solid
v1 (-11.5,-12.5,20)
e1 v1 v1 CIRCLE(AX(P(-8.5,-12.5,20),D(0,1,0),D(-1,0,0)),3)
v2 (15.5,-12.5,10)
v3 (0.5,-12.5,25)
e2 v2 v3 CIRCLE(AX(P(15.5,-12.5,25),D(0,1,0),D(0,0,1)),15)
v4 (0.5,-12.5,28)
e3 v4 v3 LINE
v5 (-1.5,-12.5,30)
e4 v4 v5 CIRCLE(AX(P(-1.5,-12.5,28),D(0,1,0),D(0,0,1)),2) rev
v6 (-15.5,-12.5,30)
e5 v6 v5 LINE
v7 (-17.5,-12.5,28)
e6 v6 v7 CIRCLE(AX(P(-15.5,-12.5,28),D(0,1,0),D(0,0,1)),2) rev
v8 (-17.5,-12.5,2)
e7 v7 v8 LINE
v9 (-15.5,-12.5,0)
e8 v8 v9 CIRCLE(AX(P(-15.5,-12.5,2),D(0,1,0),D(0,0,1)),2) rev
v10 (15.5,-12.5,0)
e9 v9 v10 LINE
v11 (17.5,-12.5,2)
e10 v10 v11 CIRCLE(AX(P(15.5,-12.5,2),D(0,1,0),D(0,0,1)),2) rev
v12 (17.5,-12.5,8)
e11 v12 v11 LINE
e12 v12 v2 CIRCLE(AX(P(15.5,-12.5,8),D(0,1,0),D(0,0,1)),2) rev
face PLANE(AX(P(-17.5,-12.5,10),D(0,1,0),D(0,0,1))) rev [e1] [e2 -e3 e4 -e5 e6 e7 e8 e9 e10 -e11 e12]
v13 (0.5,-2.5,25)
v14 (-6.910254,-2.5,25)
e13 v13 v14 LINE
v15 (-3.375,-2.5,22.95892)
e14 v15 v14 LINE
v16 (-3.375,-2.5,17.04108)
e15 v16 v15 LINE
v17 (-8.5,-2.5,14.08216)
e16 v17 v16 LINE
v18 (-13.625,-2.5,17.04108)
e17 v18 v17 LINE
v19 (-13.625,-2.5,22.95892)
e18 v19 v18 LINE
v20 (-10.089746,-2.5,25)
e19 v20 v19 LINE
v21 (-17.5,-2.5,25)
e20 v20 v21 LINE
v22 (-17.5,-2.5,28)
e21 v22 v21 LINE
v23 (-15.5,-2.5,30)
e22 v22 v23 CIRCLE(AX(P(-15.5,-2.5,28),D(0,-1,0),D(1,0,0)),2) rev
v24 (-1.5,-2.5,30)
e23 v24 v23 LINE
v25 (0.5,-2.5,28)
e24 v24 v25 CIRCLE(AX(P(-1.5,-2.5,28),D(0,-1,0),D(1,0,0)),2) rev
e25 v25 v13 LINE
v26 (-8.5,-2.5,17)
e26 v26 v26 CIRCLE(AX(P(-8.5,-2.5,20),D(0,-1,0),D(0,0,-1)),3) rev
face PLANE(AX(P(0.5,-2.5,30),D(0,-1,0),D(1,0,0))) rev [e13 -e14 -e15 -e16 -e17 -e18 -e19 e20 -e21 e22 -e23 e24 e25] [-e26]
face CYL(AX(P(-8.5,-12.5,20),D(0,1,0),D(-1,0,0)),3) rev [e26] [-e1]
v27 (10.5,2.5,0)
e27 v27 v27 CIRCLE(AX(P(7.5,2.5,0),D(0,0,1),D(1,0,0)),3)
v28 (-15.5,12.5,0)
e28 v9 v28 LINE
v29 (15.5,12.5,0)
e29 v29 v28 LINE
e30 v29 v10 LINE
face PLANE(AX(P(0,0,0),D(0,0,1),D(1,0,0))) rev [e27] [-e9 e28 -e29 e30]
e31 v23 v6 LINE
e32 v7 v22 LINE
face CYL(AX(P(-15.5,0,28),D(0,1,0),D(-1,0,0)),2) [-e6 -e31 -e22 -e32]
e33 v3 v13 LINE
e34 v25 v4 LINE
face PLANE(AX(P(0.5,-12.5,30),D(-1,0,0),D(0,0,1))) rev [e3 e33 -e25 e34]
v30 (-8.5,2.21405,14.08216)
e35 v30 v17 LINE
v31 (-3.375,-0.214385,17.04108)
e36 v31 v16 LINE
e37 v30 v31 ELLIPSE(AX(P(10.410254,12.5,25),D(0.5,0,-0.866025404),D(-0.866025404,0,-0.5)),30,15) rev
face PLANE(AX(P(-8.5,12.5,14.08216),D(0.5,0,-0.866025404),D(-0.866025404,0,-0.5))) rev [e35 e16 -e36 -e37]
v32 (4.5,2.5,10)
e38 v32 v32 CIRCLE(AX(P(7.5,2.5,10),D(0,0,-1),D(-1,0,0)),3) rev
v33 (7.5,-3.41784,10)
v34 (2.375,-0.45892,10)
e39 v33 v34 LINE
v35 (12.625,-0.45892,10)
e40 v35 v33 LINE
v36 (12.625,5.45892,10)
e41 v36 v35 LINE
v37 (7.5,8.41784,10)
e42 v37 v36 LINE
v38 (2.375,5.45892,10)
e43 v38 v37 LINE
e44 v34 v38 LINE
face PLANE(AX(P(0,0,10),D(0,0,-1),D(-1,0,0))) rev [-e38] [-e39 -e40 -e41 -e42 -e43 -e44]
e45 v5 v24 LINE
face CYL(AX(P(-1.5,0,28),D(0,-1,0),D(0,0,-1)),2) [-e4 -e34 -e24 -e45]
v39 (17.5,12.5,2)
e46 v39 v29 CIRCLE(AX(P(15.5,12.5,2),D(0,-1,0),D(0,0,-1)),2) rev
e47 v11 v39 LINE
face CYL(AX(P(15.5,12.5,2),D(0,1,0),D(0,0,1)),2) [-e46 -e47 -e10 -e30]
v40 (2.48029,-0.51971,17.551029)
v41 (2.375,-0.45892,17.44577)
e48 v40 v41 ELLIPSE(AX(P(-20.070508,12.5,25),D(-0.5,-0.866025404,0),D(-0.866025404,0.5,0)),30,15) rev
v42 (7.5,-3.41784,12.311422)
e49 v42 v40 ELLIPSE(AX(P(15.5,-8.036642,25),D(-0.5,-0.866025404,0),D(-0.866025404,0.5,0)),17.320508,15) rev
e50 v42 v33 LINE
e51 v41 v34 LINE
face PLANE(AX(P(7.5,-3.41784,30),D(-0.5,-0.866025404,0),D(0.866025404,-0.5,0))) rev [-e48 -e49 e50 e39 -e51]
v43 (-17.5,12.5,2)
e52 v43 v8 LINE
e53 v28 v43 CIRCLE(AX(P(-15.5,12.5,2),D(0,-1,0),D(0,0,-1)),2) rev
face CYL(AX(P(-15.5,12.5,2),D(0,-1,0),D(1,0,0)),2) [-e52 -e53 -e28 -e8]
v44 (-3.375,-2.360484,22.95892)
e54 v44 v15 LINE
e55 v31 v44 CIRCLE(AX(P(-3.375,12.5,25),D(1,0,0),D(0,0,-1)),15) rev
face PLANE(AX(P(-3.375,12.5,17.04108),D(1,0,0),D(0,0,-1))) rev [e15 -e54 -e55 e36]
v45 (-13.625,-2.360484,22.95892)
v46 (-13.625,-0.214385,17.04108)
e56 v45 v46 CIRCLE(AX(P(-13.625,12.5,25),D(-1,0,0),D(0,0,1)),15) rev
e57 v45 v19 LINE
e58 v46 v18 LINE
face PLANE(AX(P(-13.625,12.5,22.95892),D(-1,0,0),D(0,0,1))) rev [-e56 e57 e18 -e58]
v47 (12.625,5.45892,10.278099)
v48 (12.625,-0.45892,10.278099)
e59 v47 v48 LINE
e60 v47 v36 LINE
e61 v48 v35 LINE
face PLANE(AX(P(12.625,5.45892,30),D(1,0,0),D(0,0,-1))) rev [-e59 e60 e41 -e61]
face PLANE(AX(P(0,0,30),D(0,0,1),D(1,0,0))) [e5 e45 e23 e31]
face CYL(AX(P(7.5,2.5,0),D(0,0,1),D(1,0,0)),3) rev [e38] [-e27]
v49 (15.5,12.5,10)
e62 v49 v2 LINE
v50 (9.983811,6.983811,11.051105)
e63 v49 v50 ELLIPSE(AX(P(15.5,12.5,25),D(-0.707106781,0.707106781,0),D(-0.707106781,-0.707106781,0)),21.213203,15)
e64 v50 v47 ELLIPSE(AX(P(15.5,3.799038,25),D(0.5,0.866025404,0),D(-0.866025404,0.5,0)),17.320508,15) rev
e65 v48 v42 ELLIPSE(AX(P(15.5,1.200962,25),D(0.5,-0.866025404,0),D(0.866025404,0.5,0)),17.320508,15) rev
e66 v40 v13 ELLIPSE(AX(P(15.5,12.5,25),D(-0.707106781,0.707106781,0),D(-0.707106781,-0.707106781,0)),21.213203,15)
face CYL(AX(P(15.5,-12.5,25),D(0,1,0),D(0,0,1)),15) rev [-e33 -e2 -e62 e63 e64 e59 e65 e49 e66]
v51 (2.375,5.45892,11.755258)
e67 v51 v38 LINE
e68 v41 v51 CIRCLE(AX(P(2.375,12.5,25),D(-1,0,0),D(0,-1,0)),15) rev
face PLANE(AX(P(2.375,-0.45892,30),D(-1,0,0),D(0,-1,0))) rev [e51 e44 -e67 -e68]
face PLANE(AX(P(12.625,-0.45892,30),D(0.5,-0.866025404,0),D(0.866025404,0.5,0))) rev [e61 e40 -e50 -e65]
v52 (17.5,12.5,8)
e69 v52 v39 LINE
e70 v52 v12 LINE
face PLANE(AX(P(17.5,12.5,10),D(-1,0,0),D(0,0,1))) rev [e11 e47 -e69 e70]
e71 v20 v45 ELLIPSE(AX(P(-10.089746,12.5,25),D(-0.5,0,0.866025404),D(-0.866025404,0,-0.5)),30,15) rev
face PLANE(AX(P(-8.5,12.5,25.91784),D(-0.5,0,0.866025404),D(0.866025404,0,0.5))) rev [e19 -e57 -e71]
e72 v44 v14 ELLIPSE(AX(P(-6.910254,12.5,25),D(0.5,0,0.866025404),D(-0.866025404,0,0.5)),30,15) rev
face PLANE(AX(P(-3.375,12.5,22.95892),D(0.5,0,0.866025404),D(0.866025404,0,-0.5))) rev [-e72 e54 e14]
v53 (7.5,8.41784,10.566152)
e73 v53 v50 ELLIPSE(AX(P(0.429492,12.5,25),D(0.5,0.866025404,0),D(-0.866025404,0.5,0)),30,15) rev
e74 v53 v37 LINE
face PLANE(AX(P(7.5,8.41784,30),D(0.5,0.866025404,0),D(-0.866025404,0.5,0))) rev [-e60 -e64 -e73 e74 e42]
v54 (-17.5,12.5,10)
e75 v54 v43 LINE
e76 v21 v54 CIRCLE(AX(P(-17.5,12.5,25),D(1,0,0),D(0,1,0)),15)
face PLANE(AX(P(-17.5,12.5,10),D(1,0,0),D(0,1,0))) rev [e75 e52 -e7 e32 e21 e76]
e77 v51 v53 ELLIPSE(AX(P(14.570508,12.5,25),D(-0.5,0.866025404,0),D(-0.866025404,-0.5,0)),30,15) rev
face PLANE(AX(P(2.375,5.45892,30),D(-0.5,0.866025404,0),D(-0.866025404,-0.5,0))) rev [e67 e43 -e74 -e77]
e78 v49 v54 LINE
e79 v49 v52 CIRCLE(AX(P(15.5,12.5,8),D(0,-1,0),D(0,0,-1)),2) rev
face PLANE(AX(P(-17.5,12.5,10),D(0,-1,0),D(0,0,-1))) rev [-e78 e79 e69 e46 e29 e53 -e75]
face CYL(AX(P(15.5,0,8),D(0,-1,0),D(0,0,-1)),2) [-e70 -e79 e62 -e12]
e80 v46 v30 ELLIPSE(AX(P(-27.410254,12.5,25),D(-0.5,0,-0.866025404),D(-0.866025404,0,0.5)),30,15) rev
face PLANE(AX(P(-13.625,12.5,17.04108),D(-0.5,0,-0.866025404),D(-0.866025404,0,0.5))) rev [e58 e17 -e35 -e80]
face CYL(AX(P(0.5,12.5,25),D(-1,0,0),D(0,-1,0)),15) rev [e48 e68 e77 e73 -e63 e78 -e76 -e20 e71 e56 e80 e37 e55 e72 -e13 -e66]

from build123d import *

# Parameters (mm, degrees)
SKETCH1_W           = 35
SKETCH1_H           = 25
BOSS_EXTRUDE1_DEPTH = 10
SKETCH2_R           = 3
CUT_EXTRUDE1_DEPTH  = 24.717082451
SKETCH3_W           = 18
SKETCH3_H           = 10
BOSS_EXTRUDE2_DEPTH = 20
SKETCH4_R           = 3
CUT_EXTRUDE2_DEPTH  = 38.831864876
FILLET2_R           = 15
FILLET3_R           = 2
CUT_EXTRUDE3_START  = -10
CUT_EXTRUDE3_DEPTH  = 27.912057753
CUT_EXTRUDE4_START  = -10
CUT_EXTRUDE4_DEPTH  = 33.793107057


# Some blends are built 0.0001 mm under size
with BuildPart() as part:
    # Sketch1 → Boss-Extrude1 (new body)
    with BuildSketch(Plane.XY):
        Rectangle(SKETCH1_W, SKETCH1_H)
    extrude(amount=BOSS_EXTRUDE1_DEPTH)

    # Sketch2 → Cut-Extrude1 (cut, through all)
    with BuildSketch(Plane.XY.offset(10)):
        with Locations((7.5, 2.5)):
            Circle(SKETCH2_R)
    extrude(amount=-CUT_EXTRUDE1_DEPTH, mode=Mode.SUBTRACT)

    # Sketch3 → Boss-Extrude2 (add)
    with BuildSketch(Plane.XY.offset(10)):
        with Locations((-8.5, -7.5)):
            Rectangle(SKETCH3_W, SKETCH3_H)
    extrude(amount=BOSS_EXTRUDE2_DEPTH)

    # Sketch4 → Cut-Extrude2 (cut, through all)
    with BuildSketch(Plane(origin=(0, -2.5, 0), x_dir=(1, 0, 0), z_dir=(0, 1, 0))):
        with Locations(Location((-8.5, -20, 0), (0, 0, 180))):
            Circle(SKETCH4_R)
    extrude(amount=-CUT_EXTRUDE2_DEPTH, mode=Mode.SUBTRACT)

    # Fillet2
    # the kernel refuses this fillet: 15 mm, written as the material it adds along each edge
    with BuildSketch(Plane(origin=(-17.5, -2.5, 10), x_dir=(0, 1, 0), z_dir=(1, 0, 0))) as fillet2_piece_1_section:
        with BuildLine():
            CenterArc((FILLET2_R, FILLET2_R), FILLET2_R, 180, 90)
            Line((0, FILLET2_R), (0, 0))
            Line((0, 0), (FILLET2_R, 0))
        make_face()
    fillet2_piece_1 = extrude(amount=18, mode=Mode.PRIVATE)
    fillet2_piece_1 = fillet2_piece_1 - Plane(origin=(-8.5, 1.000391612, 20), x_dir=(-1, 0, 0), z_dir=(0, 1, 0)) * Cylinder(3, 96, mode=Mode.PRIVATE)
    add(fillet2_piece_1)
    with BuildSketch(Plane(origin=(0.5, -2.5, 10), x_dir=(1, 0, 0), z_dir=(0, -1, 0))) as fillet2_piece_2:
        with BuildLine():
            CenterArc((FILLET2_R, FILLET2_R), FILLET2_R, 180, 90)
            Line((0, FILLET2_R), (0, 0))
            Line((0, 0), (FILLET2_R, 0))
        make_face()
    extrude(amount=10)
    with BuildSketch(Plane(origin=(-17.5, -2.5, 10), x_dir=(0, 1, 0), z_dir=(1, 0, 0))) as fillet2_piece_3a_section:
        with BuildLine():
            CenterArc((FILLET2_R, FILLET2_R), FILLET2_R, 180, 90)
            Line((0, FILLET2_R), (0, 0))
            Line((0, 0), (FILLET2_R, 0))
        make_face()
    fillet2_piece_3a = extrude(amount=55.5, mode=Mode.PRIVATE)
    fillet2_piece_3a = split(fillet2_piece_3a, bisect_by=Plane(origin=(17.5, 8.593163467, 10.419487564), z_dir=(-1, 0, 0)), keep=Keep.TOP, mode=Mode.PRIVATE)
    fillet2_piece_3a = fillet2_piece_3a - Plane(origin=(7.5, 2.5, 10.419487564), x_dir=(1, 0, 0), z_dir=(0, 0, 1)) * Cylinder(3, 171, mode=Mode.PRIVATE)
    fillet2_piece_3a = split(fillet2_piece_3a, bisect_by=Plane(origin=(0.5, 8.593163467, 10.419487564), z_dir=(1, 0, 0)), keep=Keep.TOP, mode=Mode.PRIVATE)
    with BuildSketch(Plane(origin=(0.5, 35, 10), x_dir=(1, 0, 0), z_dir=(0, -1, 0))) as fillet2_piece_3b_section:
        with BuildLine():
            CenterArc((FILLET2_R, FILLET2_R), FILLET2_R, 180, 90)
            Line((0, FILLET2_R), (0, 0))
            Line((0, 0), (FILLET2_R, 0))
        make_face()
    fillet2_piece_3b = extrude(amount=47.5, mode=Mode.PRIVATE)
    fillet2_piece_3b = split(fillet2_piece_3b, bisect_by=Plane(origin=(3.591954859, 12.5, 13.608813205), z_dir=(0, -1, 0)), keep=Keep.TOP, mode=Mode.PRIVATE)
    fillet2_piece_3b = fillet2_piece_3b - Plane(origin=(7.5, 2.5, 13.608813205), x_dir=(1, 0, 0), z_dir=(0, 0, 1)) * Cylinder(3, 155, mode=Mode.PRIVATE)
    fillet2_piece_3b = split(fillet2_piece_3b, bisect_by=Plane(origin=(3.591954859, -2.5, 13.608813205), z_dir=(0, 1, 0)), keep=Keep.TOP, mode=Mode.PRIVATE)
    fillet2_piece_3 = fillet2_piece_3a & fillet2_piece_3b
    add(fillet2_piece_3)

    # Fillet3
    fillet3_edges = [part.edges().sort_by_distance(p)[0] for p in [
        (17.5, 0, 0),
        (-17.5, 0, 0),
        (-17.5, -7.5, 30),
        (0.5, -7.5, 30),
        (17.5, 0, 10),
    ]]
    fillet(fillet3_edges, radius=FILLET3_R - 0.0001)  # a hair under: the kernel refuses the full size

    # Sketch5 → Cut-Extrude3 (cut, through all)
    with BuildSketch(Plane(origin=(0, 0, 0), x_dir=(-1, 0, 0), z_dir=(0, 0, -1)).offset(CUT_EXTRUDE3_START)):
        Polygon((-7.5, -3.417840259), (-2.375, -0.45892013), (-2.375, 5.45892013), (-7.5, 8.417840259), (-12.625, 5.45892013), (-12.625, -0.45892013), align=None)
    extrude(amount=-CUT_EXTRUDE3_DEPTH, mode=Mode.SUBTRACT)

    # Sketch6 → Cut-Extrude4 (cut, through all)
    with BuildSketch(Plane.XZ.offset(12.5).offset(CUT_EXTRUDE4_START)):
        Polygon((-8.5, 14.082159741), (-3.375, 17.04107987), (-3.375, 22.95892013), (-8.5, 25.917840259), (-13.625, 22.95892013), (-13.625, 17.04107987), align=None)
    extrude(amount=-CUT_EXTRUDE4_DEPTH, mode=Mode.SUBTRACT)


solid = part.part
